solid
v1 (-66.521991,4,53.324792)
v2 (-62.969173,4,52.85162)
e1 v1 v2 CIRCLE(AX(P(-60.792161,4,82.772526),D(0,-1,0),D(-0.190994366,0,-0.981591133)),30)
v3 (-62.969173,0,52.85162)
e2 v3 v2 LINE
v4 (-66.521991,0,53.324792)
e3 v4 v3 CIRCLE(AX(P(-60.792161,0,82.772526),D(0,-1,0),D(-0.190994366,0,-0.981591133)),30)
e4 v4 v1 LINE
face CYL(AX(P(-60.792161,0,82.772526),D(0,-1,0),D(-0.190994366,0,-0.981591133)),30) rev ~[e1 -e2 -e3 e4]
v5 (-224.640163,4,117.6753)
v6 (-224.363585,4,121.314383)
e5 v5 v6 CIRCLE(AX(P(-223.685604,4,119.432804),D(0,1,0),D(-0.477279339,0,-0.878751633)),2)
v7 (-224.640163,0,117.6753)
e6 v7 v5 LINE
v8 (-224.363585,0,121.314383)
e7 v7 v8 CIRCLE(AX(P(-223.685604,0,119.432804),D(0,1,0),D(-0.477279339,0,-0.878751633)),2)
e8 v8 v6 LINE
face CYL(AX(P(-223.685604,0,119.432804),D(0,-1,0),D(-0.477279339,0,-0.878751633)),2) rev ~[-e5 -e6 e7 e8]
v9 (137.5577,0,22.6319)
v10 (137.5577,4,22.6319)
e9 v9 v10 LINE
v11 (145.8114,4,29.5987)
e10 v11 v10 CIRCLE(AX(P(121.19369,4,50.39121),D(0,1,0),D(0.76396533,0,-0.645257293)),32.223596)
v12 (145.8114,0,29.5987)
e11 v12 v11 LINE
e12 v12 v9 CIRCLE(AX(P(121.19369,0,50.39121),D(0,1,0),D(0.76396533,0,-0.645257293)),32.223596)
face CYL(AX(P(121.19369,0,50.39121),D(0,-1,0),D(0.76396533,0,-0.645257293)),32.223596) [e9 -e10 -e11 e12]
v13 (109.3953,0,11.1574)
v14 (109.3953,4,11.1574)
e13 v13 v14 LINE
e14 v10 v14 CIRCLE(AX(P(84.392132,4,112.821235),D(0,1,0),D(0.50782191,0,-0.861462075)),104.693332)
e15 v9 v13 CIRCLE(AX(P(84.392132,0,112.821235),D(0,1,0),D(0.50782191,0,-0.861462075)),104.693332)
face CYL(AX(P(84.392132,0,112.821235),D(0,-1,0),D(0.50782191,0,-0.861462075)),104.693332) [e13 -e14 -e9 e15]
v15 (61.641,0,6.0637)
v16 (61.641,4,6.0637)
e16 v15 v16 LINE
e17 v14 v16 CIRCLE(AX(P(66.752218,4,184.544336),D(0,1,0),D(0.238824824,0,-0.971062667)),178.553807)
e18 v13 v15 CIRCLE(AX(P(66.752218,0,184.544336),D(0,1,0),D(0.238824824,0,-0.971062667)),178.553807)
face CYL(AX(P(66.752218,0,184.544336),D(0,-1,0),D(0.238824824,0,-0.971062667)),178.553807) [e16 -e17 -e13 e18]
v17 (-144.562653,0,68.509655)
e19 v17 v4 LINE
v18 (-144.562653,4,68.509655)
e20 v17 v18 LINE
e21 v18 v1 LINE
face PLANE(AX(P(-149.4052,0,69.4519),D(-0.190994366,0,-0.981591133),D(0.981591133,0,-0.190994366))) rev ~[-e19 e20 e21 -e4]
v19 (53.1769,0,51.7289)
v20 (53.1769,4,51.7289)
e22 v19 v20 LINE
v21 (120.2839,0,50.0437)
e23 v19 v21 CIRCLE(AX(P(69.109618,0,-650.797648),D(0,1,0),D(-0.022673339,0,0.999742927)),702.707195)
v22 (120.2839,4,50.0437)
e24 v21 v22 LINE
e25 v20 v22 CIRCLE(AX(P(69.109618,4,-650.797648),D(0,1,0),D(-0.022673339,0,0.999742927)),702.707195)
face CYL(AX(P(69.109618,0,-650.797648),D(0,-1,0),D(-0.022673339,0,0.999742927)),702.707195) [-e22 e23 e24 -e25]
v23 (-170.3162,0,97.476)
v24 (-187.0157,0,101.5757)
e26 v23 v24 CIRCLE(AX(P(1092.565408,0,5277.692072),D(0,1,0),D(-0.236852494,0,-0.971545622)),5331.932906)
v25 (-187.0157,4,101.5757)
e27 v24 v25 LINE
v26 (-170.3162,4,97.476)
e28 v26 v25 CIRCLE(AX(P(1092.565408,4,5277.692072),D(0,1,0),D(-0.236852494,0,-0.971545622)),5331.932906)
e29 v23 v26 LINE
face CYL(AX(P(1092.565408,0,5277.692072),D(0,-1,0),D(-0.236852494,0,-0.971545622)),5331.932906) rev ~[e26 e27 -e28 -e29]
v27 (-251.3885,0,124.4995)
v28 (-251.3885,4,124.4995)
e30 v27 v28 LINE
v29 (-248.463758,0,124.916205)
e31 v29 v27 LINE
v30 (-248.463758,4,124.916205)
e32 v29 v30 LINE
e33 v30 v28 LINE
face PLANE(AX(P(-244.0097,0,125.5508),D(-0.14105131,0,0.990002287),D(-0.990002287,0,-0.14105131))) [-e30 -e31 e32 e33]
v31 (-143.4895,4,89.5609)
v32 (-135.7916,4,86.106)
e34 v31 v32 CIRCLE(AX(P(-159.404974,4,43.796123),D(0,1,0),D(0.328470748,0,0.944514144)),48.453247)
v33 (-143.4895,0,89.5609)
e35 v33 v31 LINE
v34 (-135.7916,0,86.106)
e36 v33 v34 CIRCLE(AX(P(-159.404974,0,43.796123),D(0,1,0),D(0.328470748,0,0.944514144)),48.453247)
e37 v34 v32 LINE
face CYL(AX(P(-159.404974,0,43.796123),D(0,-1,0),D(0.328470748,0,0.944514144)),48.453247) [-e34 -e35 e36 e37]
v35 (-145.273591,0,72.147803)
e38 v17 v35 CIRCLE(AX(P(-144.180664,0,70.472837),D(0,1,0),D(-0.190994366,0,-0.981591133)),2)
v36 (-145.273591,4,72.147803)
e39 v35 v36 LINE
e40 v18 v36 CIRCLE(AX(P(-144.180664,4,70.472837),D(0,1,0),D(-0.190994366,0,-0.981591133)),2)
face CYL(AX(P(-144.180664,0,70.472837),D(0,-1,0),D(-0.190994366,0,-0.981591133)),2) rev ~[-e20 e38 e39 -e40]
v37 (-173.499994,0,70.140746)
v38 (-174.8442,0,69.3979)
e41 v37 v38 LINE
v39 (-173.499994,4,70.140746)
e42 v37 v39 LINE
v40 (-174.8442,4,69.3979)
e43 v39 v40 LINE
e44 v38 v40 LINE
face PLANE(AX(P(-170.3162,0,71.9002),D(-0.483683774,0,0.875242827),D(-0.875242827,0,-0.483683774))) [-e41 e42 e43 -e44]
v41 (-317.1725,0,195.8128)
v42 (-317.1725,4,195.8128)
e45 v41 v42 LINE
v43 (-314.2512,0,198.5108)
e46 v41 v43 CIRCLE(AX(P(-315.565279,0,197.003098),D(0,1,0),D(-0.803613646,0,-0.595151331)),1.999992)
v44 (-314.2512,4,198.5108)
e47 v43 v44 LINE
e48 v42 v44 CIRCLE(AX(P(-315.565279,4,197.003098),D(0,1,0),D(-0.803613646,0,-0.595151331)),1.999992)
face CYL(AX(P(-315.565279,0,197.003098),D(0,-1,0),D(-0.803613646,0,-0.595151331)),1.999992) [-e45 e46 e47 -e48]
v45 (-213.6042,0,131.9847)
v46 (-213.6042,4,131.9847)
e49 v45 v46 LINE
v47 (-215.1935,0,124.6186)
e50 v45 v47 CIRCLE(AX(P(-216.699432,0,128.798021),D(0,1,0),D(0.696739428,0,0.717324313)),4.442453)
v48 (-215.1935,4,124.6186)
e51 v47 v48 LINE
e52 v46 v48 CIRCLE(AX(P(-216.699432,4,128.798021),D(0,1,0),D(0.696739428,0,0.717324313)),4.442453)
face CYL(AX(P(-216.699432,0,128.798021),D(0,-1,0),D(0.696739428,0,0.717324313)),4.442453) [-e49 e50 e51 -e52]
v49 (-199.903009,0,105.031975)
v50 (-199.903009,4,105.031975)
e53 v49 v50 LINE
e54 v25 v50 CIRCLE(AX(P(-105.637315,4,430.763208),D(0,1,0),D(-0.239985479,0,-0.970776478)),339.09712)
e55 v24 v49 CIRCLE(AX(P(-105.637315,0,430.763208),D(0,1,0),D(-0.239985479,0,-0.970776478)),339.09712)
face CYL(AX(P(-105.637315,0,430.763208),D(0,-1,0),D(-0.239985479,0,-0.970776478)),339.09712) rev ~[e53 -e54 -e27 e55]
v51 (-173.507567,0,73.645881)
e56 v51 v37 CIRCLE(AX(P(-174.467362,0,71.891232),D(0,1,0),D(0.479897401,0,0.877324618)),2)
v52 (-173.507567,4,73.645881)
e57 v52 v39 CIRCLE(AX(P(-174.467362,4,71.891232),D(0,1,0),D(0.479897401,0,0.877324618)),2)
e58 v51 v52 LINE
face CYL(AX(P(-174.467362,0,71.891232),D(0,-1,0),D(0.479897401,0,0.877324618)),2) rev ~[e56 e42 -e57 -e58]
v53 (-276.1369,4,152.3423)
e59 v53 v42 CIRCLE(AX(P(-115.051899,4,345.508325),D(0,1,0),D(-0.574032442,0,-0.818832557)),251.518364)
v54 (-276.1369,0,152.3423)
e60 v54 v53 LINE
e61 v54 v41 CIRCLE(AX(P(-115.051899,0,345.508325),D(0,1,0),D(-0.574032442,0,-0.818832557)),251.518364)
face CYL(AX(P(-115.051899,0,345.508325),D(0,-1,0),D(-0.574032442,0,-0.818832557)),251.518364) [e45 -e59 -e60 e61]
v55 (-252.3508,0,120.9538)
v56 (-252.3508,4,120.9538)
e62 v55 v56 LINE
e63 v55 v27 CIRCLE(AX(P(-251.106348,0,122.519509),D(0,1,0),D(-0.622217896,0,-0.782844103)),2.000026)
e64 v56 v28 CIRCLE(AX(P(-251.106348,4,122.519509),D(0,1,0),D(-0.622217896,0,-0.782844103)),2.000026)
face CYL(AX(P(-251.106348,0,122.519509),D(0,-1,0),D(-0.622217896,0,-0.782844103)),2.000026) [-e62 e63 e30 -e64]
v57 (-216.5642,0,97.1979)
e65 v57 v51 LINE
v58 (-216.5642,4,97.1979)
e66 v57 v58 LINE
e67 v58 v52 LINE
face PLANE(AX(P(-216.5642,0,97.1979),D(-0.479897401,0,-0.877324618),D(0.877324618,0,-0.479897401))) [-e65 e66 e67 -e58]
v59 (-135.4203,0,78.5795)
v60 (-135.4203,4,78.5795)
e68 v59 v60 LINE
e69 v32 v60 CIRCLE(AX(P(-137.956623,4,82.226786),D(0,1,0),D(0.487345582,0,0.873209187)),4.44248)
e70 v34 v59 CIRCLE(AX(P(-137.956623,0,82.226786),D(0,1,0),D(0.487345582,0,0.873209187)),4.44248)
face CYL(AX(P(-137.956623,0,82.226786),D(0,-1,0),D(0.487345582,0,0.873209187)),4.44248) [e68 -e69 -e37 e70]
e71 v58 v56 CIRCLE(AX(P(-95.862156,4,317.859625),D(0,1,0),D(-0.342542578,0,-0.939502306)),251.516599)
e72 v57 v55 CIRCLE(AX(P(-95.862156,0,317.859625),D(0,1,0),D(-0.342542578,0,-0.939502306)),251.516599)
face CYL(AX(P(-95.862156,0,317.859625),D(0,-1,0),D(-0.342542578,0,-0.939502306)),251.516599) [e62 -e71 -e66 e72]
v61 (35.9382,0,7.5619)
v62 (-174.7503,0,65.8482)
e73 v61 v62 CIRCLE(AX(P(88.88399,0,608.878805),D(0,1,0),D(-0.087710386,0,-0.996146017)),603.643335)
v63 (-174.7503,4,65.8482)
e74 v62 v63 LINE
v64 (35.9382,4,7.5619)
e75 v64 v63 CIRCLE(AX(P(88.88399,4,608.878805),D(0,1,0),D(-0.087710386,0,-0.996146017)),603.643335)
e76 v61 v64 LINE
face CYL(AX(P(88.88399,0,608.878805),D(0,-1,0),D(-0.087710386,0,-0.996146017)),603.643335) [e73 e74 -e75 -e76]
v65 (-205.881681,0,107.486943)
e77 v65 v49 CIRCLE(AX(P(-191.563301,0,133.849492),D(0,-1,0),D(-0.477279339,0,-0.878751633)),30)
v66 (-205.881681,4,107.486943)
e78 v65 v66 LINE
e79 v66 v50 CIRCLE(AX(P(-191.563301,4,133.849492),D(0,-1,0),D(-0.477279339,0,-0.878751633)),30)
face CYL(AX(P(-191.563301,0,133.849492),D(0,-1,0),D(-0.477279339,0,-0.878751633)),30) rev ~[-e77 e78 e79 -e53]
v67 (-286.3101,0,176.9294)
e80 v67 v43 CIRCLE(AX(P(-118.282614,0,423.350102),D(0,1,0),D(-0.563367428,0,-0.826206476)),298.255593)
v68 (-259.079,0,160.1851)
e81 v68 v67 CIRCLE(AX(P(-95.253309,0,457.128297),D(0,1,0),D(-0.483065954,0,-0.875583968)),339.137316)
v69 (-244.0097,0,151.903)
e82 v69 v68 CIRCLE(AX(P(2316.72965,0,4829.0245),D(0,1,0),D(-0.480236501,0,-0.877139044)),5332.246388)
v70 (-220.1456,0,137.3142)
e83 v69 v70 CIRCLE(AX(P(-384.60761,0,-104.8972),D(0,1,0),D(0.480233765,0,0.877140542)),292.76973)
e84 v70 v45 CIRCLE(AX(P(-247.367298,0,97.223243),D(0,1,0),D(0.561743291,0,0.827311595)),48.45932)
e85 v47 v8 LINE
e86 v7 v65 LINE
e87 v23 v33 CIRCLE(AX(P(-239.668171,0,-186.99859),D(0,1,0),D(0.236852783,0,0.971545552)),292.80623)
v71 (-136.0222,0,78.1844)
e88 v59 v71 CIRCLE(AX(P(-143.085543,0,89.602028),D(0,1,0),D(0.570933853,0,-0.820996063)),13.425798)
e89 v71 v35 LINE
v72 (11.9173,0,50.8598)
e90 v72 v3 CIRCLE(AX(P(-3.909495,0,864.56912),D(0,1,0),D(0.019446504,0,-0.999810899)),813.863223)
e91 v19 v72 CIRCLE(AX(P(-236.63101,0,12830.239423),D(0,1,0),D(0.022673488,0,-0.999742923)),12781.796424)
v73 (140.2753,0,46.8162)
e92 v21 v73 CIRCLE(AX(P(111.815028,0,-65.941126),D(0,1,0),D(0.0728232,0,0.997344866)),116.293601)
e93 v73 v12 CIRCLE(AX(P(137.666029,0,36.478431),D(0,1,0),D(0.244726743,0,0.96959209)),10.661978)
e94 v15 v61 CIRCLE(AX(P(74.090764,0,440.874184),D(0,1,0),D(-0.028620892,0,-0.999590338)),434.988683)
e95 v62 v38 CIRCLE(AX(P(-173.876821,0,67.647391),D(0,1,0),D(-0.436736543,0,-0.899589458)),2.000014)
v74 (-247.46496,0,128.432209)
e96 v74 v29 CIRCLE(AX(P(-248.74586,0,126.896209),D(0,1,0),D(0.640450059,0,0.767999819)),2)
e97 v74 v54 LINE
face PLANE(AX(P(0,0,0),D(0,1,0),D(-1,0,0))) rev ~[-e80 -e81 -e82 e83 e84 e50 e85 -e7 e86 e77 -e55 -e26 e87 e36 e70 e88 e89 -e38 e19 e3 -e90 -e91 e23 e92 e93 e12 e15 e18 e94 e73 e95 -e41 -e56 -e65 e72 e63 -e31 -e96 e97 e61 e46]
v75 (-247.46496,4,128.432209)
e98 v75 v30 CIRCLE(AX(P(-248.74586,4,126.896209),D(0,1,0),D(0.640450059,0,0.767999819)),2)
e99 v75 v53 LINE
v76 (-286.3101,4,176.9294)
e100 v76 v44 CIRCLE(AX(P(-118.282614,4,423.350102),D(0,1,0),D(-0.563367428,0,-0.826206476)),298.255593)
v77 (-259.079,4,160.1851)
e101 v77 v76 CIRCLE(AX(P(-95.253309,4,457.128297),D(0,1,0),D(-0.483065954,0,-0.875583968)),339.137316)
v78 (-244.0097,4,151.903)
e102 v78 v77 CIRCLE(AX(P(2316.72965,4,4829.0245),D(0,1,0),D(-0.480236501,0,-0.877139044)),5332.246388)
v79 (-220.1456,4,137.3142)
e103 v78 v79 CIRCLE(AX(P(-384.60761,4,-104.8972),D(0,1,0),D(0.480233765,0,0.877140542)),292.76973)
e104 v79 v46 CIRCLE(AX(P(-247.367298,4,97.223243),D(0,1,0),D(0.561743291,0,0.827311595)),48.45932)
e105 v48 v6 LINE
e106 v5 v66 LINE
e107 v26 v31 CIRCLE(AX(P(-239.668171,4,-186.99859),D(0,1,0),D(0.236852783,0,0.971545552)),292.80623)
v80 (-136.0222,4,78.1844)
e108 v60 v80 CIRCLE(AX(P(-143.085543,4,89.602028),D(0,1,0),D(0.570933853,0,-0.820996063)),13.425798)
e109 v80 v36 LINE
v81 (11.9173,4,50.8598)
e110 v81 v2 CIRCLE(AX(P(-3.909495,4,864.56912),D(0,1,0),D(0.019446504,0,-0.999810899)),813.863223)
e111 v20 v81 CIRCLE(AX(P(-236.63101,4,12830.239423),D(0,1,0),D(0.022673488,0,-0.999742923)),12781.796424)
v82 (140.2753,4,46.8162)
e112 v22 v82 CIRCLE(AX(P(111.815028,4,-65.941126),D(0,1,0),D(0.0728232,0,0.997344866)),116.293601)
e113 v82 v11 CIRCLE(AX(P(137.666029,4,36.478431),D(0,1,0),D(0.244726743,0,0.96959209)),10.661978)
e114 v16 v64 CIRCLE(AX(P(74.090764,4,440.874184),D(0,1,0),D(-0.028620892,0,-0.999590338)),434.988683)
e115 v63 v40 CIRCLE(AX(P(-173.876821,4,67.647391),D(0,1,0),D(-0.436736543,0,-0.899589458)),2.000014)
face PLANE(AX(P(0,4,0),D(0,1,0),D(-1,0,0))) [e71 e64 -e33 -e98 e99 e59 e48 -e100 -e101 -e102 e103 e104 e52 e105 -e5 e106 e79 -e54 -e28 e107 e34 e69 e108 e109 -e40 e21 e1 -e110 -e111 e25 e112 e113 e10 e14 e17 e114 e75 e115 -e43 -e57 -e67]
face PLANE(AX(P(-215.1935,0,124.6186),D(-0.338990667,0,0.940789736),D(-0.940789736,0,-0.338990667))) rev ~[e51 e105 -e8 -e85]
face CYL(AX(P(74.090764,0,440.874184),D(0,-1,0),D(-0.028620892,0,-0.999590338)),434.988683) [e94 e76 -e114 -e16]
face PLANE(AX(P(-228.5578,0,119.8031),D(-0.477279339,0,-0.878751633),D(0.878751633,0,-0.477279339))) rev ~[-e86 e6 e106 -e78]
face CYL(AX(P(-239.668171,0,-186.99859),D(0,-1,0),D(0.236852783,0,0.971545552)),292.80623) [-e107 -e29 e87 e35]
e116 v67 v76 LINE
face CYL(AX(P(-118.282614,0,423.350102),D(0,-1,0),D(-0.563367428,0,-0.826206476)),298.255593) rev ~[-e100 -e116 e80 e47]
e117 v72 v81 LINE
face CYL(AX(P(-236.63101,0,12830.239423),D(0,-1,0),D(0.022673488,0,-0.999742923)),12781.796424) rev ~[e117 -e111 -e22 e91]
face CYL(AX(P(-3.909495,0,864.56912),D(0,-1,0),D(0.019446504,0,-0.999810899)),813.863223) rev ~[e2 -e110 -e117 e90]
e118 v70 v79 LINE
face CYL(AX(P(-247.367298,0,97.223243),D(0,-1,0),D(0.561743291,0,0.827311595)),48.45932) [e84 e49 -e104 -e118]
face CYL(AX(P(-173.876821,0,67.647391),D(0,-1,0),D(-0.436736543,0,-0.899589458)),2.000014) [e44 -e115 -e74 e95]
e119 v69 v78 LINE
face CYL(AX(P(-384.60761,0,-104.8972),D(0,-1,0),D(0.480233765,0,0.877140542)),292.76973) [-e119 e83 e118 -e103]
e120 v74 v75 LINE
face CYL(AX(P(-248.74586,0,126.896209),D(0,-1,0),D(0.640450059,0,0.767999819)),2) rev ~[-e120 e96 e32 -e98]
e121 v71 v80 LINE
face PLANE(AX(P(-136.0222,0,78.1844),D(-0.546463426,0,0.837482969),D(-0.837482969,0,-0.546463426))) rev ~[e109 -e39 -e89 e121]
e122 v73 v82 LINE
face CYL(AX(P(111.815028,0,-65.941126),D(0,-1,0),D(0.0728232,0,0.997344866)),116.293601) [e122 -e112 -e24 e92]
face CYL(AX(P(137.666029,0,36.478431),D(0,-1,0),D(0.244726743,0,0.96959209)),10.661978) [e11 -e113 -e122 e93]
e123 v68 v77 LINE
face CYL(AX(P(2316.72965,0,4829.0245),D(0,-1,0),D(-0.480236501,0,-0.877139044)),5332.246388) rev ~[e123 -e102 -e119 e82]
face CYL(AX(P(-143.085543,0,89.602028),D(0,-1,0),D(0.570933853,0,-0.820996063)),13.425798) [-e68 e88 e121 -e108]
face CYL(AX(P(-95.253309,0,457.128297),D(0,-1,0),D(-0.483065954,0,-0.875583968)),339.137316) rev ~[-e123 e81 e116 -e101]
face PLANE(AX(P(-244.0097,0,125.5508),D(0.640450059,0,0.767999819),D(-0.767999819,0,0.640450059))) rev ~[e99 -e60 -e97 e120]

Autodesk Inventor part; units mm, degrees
ref_plane "YZ Plane" through (0, 0, 0) normal (1, 0, 0) x (0, 1, 0)
ref_plane "XZ Plane" through (0, 0, 0) normal (0, 1, 0) x (-1, 0, 0)
ref_plane "XY Plane" through (0, 0, 0) normal (0, 0, 1) x (1, 0, 0)
sketch "スケッチ1" plane through (0, 0, 0) normal (0, 1, 0) x (-1, 0, 0)
  arc A0 (317.1725, 195.8128) -> (314.2512, 198.5108) centre (315.5653, 197.0031) ccw projected
  arc A1 (259.4316, 139.5569) -> (317.1725, 195.8128) centre (115.0525, 345.5076) ccw projected
  arc A2 (250.4691, 133.6616) -> (259.4316, 139.5569) centre (155.393, 287.9636) ccw projected
  arc A3 (232.176, 125.5508) -> (250.4691, 133.6616) centre (211.4405, 197.0022) ccw projected
  arc A4 (219.6233, 123.8241) -> (232.176, 125.5508) centre (220.0183, 167.4446) ccw projected
  arc A5 (215.1935, 124.6186) -> (219.6233, 123.8241) centre (219.7448, 137.2497) ccw projected
  arc A6 (213.6042, 131.9847) -> (215.1935, 124.6186) centre (216.6995, 128.798) ccw projected
  arc A7 (220.1456, 137.3142) -> (213.6042, 131.9847) centre (247.3645, 97.227) ccw projected
  arc A8 (244.0097, 151.903) -> (220.1456, 137.3142) centre (384.6233, -104.9243) ccw projected
  arc A9 (244.0097, 151.903) -> (259.079, 160.1851) centre (-2315.4987, 4826.7805) ccw projected
  arc A10 (259.079, 160.1851) -> (286.3101, 176.9294) centre (95.2726, 457.0952) ccw projected
  arc A11 (286.3101, 176.9294) -> (314.2512, 198.5108) centre (118.2808, 423.3526) ccw projected
  arc A12 (252.3508, 120.9538) -> (250.2273, 124.316) centre (251.1064, 122.5195) ccw projected
  arc A13 (217.6526, 110.7016) -> (250.2273, 124.316) centre (119.1278, 392.2173) ccw projected
  arc A14 (187.0157, 101.5757) -> (217.6526, 110.7016) centre (105.6368, 430.7651) ccw projected
  arc A15 (170.3162, 97.476) -> (187.0157, 101.5757) centre (-1092.0317, 5275.5105) ccw projected
  arc A16 (170.3162, 97.476) -> (143.4895, 89.5609) centre (239.6668, -186.9935) ccw projected
  arc A17 (143.4895, 89.5609) -> (135.7916, 86.106) centre (159.4055, 43.7948) ccw projected
  arc A18 (135.7916, 86.106) -> (135.4203, 78.5795) centre (137.9566, 82.2268) ccw projected
  arc A19 (135.4203, 78.5795) -> (139.4934, 76.6657) centre (143.0857, 89.6023) ccw projected
  arc A20 (139.4934, 76.6657) -> (152.0654, 75.0846) centre (151.1648, 118.6976) ccw projected
  arc A21 (152.0654, 75.0846) -> (171.8343, 78.1844) centre (150.5294, 149.4681) ccw projected
  arc A22 (171.8343, 78.1844) -> (182.0173, 81.5592) centre (119.9342, 251.8363) ccw projected
  arc A23 (182.0173, 81.5592) -> (252.3508, 120.9538) centre (95.8618, 317.8604) ccw projected
  arc A24 (174.7503, 65.8482) -> (173.4237, 69.5954) centre (173.8768, 67.6474) ccw projected
  arc A25 (64.7746, 52.985) -> (173.4237, 69.5954) centre (11.2401, 766.801) ccw projected
  arc A26 (-11.9173, 50.8598) -> (64.7746, 52.985) centre (3.9096, 864.5436) ccw projected
  arc A27 (-53.1769, 51.7289) -> (-11.9173, 50.8598) centre (236.8377, 12839.6895) ccw projected
  arc A28 (-53.1769, 51.7289) -> (-120.2839, 50.0437) centre (-69.1096, -650.8128) ccw projected
  arc A29 (-120.2839, 50.0437) -> (-140.2753, 46.8162) centre (-111.8153, -65.9388) ccw projected
  arc A30 (-140.2753, 46.8162) -> (-145.8114, 29.5987) centre (-137.666, 36.4784) ccw projected
  arc A31 (-145.8114, 29.5987) -> (-137.5577, 22.6319) centre (-121.1943, 50.3906) ccw projected
  arc A32 (-137.5577, 22.6319) -> (-109.3953, 11.1574) centre (-84.3921, 112.8213) ccw projected
  arc A33 (-109.3953, 11.1574) -> (-61.641, 6.0637) centre (-66.7514, 184.549) ccw projected
  arc A34 (-61.641, 6.0637) -> (-35.9382, 7.5619) centre (-74.0904, 440.8658) ccw projected
  arc A35 (-35.9382, 7.5619) -> (174.7503, 65.8482) centre (-88.8837, 608.8772) ccw projected
  line L0 (244.0097, 125.5508) -> (251.3885, 124.4995)
  line L1 (215.1935, 124.6186) -> (228.5578, 119.8031)
  line L2 (228.5578, 119.8031) -> (203.0926, 105.9721)
  line L3 (216.5642, 97.1979) -> (170.3162, 71.9002)
  line L4 (170.3162, 71.9002) -> (174.8442, 69.3979)
  line L5 (136.0222, 78.1844) -> (149.4052, 69.4519)
  line L6 (149.4052, 69.4519) -> (64.7767, 52.9852)
  line L7 (244.0097, 125.5508) -> (276.1369, 152.3423)
  point P0 (0, 0)
extrude "押し出し1" add sketch "スケッチ1" along normal blind 4
fillet "フィレット1" radius 2 4 edges at (-228.5578, 2, 119.8031) (-149.4052, 2, 69.4519) (-244.0097, 2, 125.5508) (-170.3162, 2, 71.9002)
fillet "フィレット1" radius 30 2 edges at (-203.0926, 2, 105.9721) (-64.7767, 2, 52.9852)
properties part number "bracket2" material "木材 (オーク)"
